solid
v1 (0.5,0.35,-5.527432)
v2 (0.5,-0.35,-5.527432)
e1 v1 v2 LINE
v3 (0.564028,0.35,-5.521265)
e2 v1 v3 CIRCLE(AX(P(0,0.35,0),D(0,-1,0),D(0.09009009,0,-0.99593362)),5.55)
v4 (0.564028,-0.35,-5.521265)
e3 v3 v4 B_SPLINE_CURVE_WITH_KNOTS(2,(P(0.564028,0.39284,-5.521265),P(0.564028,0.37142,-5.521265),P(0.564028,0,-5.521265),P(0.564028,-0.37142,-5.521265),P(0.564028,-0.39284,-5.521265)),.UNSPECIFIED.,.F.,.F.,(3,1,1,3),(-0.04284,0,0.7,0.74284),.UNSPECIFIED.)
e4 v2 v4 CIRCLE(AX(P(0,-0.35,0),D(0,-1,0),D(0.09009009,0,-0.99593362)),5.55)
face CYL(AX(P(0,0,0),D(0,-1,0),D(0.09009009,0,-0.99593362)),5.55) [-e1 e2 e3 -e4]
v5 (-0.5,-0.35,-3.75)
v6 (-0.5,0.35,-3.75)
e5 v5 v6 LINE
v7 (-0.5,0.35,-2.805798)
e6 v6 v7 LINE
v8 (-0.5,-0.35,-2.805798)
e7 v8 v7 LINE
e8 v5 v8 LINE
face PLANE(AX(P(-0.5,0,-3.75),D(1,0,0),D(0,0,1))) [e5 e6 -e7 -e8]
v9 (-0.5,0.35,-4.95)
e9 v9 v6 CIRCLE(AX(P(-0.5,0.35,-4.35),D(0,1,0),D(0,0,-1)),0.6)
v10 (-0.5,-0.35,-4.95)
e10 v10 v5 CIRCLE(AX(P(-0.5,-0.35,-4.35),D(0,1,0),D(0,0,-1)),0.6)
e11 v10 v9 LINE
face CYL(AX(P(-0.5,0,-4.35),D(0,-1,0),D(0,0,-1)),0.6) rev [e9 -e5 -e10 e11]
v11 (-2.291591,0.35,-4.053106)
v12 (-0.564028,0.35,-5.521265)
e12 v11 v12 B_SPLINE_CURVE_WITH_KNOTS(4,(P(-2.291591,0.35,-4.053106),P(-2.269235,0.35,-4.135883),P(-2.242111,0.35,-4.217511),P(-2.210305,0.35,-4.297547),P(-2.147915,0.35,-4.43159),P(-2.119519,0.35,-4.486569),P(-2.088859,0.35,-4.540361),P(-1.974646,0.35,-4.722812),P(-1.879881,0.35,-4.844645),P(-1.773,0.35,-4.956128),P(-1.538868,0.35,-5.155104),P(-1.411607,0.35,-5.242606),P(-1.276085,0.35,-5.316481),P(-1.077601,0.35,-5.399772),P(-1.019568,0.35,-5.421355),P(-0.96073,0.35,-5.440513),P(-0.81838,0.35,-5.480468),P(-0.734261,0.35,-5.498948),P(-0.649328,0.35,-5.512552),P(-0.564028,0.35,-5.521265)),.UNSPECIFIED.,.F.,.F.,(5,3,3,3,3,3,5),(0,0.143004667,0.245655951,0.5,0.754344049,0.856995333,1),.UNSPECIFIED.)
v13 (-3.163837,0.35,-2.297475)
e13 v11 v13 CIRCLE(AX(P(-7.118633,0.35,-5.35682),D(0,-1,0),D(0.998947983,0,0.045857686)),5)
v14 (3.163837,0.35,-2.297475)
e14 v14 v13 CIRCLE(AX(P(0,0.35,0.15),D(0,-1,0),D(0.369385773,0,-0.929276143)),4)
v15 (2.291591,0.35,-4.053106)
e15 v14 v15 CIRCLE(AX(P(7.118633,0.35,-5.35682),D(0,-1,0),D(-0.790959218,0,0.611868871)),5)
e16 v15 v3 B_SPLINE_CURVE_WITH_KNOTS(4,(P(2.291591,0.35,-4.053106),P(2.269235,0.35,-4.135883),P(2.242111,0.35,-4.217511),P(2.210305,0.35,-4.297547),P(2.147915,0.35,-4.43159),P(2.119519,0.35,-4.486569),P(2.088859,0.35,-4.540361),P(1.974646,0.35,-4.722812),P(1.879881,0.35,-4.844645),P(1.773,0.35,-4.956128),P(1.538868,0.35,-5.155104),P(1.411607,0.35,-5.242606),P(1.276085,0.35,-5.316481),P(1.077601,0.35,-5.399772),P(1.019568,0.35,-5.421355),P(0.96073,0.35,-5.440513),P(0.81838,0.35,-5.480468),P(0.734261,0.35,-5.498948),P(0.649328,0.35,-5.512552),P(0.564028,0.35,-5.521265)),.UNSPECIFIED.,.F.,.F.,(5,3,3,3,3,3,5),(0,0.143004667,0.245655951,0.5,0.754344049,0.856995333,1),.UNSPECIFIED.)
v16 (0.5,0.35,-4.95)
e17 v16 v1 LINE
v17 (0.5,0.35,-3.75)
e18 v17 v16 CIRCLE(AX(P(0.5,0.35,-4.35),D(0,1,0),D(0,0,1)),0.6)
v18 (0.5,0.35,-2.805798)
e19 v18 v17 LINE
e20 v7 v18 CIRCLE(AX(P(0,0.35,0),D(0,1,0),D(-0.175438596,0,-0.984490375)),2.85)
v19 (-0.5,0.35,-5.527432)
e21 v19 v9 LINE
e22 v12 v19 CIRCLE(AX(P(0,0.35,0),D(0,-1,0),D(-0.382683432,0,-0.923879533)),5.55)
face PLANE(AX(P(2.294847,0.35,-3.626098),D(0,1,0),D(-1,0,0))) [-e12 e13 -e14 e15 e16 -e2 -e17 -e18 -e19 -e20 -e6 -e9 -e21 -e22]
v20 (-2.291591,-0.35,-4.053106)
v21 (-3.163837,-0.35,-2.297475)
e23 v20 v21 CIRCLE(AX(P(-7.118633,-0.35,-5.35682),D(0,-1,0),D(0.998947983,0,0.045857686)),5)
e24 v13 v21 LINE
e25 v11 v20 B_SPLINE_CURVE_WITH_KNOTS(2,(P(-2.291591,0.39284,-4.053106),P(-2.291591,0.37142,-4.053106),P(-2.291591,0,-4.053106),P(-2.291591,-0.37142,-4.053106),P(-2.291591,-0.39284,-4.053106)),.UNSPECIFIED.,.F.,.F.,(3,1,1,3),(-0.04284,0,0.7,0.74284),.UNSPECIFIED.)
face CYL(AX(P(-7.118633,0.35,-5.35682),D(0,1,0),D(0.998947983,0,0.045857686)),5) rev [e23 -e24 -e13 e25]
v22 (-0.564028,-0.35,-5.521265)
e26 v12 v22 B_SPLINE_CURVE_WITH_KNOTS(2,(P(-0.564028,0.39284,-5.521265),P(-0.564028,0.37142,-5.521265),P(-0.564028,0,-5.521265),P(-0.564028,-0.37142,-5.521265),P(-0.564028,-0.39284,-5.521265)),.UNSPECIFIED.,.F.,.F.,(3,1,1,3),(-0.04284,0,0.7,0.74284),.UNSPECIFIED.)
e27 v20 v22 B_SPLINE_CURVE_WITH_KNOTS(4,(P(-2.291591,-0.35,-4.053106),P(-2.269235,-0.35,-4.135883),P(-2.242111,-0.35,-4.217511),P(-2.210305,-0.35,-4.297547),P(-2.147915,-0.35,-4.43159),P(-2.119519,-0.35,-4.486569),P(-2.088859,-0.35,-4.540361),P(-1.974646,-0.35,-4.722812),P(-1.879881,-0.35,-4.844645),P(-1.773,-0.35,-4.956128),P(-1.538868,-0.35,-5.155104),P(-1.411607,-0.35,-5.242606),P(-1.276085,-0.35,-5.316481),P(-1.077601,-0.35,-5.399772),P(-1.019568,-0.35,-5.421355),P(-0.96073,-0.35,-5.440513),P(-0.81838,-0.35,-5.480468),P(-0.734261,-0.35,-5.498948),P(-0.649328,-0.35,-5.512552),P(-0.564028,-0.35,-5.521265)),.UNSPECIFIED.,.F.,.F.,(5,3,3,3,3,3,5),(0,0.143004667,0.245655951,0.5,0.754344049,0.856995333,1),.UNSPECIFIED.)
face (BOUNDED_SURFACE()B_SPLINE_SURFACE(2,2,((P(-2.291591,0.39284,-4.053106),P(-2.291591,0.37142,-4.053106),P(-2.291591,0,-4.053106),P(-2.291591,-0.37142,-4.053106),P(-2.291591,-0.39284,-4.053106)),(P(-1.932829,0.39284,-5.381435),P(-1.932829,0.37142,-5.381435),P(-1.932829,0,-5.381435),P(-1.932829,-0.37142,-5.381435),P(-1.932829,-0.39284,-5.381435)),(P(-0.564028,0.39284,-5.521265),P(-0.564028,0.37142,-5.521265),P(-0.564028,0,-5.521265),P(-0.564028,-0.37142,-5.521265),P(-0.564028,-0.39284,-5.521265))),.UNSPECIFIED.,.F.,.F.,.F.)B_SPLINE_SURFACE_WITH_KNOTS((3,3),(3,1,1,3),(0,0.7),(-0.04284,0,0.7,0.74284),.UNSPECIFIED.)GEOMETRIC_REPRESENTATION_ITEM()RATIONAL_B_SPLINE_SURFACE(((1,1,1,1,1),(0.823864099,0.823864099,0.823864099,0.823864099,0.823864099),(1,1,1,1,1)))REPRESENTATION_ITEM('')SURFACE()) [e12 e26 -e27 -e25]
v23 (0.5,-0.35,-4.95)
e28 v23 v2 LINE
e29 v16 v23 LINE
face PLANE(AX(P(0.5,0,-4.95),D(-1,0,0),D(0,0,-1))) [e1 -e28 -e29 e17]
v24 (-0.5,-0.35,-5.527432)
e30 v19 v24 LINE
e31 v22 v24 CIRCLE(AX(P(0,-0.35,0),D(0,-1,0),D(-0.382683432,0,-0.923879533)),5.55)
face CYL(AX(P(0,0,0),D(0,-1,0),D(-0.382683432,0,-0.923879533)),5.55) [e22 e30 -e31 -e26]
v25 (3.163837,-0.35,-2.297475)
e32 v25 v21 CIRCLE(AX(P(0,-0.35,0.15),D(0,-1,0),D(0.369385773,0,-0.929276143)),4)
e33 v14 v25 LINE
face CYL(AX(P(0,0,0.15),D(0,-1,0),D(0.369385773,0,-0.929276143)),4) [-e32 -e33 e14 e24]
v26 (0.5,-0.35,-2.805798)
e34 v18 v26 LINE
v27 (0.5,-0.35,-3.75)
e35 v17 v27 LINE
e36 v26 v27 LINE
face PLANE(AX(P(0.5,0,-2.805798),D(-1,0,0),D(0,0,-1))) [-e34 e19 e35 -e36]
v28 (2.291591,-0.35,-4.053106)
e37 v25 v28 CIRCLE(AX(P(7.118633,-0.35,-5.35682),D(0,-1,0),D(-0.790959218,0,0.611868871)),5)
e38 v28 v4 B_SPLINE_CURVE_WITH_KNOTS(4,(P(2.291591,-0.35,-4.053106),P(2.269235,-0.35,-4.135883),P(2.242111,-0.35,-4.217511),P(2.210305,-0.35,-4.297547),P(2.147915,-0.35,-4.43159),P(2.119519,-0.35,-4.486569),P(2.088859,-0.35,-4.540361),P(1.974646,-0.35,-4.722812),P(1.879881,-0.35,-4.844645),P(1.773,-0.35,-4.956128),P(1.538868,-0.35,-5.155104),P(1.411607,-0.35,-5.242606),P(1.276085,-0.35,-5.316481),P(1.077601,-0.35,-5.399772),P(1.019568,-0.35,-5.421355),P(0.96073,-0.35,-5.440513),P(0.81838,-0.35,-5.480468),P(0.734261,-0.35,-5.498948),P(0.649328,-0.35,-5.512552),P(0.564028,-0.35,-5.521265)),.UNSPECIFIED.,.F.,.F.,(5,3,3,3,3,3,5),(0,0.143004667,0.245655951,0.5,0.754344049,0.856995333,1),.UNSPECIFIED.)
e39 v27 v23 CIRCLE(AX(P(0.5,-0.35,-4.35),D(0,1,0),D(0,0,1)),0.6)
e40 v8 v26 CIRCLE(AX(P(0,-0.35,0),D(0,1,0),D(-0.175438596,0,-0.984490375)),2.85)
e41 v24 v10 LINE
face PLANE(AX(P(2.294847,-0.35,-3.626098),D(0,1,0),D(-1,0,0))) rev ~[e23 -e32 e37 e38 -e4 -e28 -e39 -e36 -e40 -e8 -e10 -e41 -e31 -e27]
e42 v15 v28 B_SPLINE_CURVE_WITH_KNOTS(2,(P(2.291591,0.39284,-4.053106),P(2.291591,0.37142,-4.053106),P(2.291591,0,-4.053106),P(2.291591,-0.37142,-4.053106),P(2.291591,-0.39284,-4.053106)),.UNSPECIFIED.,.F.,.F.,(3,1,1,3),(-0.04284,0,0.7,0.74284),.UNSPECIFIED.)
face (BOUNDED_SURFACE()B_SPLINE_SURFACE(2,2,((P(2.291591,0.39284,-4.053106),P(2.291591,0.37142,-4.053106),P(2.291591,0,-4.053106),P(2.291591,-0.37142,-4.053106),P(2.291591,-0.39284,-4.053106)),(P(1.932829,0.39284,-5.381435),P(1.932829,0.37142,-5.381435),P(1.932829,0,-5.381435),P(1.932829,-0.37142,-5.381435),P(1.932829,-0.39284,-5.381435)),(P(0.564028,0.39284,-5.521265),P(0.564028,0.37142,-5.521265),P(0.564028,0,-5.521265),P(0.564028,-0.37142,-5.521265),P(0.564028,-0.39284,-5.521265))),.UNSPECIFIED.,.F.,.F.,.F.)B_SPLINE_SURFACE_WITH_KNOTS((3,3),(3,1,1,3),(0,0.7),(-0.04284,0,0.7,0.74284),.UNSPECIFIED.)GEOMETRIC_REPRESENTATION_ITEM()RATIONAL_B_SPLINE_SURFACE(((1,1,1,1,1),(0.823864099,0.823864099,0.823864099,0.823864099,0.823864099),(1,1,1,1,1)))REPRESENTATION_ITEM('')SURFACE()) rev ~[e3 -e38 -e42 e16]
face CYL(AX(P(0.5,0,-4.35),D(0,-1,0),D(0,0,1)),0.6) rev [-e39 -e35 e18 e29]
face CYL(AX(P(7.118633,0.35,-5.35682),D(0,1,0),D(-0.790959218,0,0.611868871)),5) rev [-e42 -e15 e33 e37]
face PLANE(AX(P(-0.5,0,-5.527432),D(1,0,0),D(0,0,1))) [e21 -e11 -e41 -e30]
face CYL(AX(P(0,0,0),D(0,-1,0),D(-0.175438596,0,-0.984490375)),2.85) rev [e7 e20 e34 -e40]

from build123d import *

# Parameters (mm, degrees)
F1_DEPTH    = 0.35
F2_T1_DEPTH = 0.7
F3_R        = 2


# Not quite as in the source:
# - a fillet or chamfer that OpenCascade refuses, or shapes differently, is made with other operations: its cross-section is extruded or revolved along the edge and cut away or added


with BuildPart() as f1:
    # F0 (on Front) → F1 (new body, symmetric)
    with BuildSketch(Plane.XZ):
        with BuildLine():
            ThreePointArc((-0.5, -2.8057975693), (0, 2.85), (0.5, -2.8057975693))
            Line((0.5, -2.8057975693), (0.5, -3.75))
            ThreePointArc((0.5, -3.75), (1.1, -4.35), (0.5, -4.95))
            Line((0.5, -4.95), (0.5, -5.5274315916))
            ThreePointArc((0.5, -5.5274315916), (1.3270959738, -5.3889995617), (2.1238930496, -5.1275314054))
            Line((2.1238930496, -5.1275314054), (1.4775430927, -3.5671045734))
            ThreePointArc((1.4775430927, -3.5671045734), (0, 4.15), (-1.4775430927, -3.5671045734))
            Line((-1.4775430927, -3.5671045734), (-2.1238930496, -5.1275314054))
            ThreePointArc((-2.1238930496, -5.1275314054), (-1.3270959738, -5.3889995617), (-0.5, -5.5274315916))
            Line((-0.5, -5.5274315916), (-0.5, -4.95))
            ThreePointArc((-0.5, -4.95), (-1.1, -4.35), (-0.5, -3.75))
            Line((-0.5, -3.75), (-0.5, -2.8057975693))
        make_face()
    extrude(amount=F1_DEPTH, both=True)

    # F2: fillet of radius 5 on 2 edges, made by hand

    # F2_s2 → F2_t1 (join)
    with BuildSketch(Plane.XZ.offset(-0.35)):
        with BuildLine():
            ThreePointArc((3.163836873, -2.2974754832), (2.4254620947, -3.6322482415), (2.1238930496, -5.1275314054))
            Line((2.1238930496, -5.1275314054), (1.4775430927, -3.5671045734))
            ThreePointArc((1.4775430927, -3.5671045734), (2.4059491896, -3.0455294549), (3.163836873, -2.2974754832))
        make_face()
        with BuildLine():
            ThreePointArc((-2.1238930496, -5.1275314054), (-2.4254620947, -3.6322482415), (-3.163836873, -2.2974754832))
            ThreePointArc((-3.163836873, -2.2974754832), (-2.4059491896, -3.0455294549), (-1.4775430927, -3.5671045734))
            Line((-1.4775430927, -3.5671045734), (-2.1238930496, -5.1275314054))
        make_face()
    extrude(amount=F2_T1_DEPTH)

    # F3
    f3_edges = [f1.edges().sort_by_distance(p)[0] for p in [
        (-2.123893, 0, -5.127531),
        (2.123893, 0, -5.127531),
    ]]
    fillet(f3_edges, radius=F3_R)


solid = f1.part
